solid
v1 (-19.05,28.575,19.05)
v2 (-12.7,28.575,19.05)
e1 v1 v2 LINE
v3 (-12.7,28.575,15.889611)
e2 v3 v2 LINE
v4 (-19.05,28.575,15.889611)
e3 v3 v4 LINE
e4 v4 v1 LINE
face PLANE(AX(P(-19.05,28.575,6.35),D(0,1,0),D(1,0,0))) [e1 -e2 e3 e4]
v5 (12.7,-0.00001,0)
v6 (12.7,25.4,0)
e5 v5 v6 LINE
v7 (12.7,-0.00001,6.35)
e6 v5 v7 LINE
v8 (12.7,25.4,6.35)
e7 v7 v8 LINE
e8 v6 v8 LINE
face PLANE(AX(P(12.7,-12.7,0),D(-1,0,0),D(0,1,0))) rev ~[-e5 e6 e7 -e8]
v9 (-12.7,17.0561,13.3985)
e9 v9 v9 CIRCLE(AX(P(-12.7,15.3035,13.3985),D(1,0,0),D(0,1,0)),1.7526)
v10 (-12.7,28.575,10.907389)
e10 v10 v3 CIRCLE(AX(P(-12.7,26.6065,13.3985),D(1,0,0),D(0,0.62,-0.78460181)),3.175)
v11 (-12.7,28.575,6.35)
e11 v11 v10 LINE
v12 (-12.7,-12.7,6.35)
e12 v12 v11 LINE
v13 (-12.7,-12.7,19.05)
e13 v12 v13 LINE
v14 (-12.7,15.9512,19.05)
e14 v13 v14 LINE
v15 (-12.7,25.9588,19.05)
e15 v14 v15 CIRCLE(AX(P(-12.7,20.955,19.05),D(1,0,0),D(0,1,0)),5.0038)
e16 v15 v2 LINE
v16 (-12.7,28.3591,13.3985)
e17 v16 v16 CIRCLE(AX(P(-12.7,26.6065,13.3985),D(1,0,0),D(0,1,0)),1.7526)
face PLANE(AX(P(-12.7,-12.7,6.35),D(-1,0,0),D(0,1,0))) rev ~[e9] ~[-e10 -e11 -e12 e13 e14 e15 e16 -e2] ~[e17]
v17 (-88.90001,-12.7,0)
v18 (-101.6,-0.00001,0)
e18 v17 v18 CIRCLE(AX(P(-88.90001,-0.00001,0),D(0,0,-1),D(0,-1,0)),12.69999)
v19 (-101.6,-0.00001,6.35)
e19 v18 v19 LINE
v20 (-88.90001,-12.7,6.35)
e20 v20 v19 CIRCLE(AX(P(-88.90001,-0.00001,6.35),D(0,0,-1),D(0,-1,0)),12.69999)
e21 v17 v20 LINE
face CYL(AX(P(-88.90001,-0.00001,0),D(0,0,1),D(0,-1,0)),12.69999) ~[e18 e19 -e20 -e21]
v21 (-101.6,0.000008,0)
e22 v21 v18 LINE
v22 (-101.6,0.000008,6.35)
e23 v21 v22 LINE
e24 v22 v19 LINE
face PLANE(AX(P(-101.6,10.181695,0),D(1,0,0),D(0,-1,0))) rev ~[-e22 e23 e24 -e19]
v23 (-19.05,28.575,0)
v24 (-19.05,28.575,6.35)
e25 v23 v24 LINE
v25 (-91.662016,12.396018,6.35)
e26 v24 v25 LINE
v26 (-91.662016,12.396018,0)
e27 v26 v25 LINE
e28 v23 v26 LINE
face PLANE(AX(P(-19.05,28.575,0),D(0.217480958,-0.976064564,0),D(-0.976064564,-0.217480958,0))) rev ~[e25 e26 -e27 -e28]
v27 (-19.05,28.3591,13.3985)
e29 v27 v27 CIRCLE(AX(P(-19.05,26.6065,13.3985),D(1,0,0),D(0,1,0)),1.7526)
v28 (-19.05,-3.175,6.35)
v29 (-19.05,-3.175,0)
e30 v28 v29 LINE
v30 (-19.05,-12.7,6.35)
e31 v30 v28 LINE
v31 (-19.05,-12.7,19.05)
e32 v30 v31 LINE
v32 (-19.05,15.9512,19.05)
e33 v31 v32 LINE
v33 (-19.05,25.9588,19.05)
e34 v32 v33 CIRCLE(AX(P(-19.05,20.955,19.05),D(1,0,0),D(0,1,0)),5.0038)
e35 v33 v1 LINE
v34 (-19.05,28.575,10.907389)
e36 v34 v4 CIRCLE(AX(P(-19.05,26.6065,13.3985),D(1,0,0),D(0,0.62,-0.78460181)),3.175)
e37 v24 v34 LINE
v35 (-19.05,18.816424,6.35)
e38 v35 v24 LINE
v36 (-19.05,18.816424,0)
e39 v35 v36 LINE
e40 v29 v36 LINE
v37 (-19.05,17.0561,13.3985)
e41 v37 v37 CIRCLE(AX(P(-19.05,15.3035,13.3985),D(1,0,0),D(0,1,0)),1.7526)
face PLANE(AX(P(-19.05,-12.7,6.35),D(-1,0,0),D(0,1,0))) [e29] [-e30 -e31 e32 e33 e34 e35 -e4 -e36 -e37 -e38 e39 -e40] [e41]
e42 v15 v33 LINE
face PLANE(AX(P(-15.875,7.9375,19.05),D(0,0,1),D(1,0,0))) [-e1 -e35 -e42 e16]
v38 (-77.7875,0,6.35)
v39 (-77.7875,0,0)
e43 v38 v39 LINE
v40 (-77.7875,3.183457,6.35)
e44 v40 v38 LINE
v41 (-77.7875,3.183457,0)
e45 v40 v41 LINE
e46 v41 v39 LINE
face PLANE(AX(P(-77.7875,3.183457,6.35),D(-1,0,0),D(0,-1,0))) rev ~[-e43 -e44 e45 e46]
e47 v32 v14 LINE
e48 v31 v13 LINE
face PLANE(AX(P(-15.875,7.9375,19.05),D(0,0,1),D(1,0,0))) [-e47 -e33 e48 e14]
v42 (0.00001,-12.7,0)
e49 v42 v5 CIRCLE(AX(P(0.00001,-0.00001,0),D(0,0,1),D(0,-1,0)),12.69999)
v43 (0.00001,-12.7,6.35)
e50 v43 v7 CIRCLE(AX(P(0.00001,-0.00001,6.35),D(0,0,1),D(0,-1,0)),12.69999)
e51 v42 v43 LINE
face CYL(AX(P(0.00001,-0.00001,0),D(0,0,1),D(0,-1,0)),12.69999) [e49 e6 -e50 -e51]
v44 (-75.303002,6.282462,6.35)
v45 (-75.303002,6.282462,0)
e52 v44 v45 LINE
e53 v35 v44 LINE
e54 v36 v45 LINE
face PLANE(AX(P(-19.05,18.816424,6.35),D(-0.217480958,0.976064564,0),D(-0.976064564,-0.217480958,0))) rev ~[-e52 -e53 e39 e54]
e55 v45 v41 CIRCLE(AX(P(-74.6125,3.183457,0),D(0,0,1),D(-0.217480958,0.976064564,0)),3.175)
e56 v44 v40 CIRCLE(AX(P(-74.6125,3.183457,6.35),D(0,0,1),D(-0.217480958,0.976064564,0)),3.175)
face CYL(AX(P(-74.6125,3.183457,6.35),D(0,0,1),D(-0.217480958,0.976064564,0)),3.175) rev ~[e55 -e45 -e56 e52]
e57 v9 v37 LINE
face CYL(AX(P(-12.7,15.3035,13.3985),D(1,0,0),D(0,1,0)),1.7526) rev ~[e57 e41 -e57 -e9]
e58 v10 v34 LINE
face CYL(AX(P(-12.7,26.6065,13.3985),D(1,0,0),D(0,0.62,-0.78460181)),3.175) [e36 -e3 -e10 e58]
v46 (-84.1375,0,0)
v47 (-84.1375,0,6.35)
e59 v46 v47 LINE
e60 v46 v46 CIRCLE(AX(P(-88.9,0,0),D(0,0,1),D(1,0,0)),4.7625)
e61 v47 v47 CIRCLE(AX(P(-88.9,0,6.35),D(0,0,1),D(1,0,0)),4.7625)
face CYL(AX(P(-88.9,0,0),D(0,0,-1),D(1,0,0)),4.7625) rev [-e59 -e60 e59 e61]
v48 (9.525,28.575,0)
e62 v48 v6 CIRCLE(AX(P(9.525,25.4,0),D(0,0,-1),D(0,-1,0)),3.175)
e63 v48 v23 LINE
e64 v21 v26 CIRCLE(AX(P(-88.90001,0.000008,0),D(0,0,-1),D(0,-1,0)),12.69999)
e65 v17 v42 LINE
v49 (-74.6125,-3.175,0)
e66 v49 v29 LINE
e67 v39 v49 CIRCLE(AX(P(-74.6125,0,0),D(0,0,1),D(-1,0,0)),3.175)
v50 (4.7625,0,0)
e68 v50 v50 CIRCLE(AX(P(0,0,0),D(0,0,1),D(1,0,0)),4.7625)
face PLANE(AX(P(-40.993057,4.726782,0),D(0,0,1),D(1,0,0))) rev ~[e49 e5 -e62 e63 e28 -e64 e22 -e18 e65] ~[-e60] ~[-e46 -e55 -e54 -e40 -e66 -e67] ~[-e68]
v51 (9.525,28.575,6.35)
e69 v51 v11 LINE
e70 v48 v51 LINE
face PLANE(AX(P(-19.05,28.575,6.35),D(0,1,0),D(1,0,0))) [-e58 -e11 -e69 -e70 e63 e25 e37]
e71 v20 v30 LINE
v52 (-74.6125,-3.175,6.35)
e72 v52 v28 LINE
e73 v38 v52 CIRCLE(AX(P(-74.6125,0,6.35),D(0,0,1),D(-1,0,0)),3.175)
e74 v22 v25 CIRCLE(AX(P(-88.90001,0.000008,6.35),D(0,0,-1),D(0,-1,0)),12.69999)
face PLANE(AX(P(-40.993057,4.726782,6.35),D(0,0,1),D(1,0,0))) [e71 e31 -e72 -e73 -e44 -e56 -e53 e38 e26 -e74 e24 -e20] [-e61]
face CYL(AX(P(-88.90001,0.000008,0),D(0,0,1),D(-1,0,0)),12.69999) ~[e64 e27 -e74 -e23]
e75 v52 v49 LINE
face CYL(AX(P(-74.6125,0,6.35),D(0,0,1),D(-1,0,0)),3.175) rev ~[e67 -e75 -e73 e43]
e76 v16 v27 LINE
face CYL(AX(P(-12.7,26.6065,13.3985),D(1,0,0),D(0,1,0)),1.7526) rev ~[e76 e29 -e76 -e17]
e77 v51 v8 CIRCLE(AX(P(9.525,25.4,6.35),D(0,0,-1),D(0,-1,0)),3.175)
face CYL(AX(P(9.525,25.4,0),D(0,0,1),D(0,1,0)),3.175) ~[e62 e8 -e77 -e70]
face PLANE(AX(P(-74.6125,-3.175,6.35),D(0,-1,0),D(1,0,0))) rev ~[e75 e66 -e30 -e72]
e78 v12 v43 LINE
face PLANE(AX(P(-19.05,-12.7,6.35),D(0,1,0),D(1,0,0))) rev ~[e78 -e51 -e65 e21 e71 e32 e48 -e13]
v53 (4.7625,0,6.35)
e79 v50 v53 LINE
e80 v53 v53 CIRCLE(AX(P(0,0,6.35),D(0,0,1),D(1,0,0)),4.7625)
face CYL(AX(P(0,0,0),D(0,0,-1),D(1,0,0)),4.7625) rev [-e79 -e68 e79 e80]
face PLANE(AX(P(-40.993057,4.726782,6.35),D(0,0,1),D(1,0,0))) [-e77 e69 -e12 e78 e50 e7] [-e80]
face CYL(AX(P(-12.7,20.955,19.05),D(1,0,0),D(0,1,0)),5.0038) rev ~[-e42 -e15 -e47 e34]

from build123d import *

# Parameters (mm, degrees)
F0_R      = 4.7625
F1_DEPTH  = 6.35
F2_R      = 12.69999
F3_W      = 6.35
F3_H      = 41.275
F4_DEPTH  = 12.7
F6_DEPTH  = 25.4
F7_R      = 3.175
F8_R      = 5.0038
F8_R_2    = 1.7526
F9_DEPTH  = 25.4
F11_DEPTH = 6.35


# Not quite as in the source:
# - a fillet or chamfer is up to 0.001 mm smaller than in the source, because OpenCascade refuses the exact size


with BuildPart() as f1:
    # F0 (on Top) → F1 (new body)
    with BuildSketch(Plane.XY):
        Polygon((-101.6, -12.7), (12.7, -12.7), (12.7, 28.575), (-19.05, 28.575), (-101.6, 10.1816951473), align=None)
        with Locations((-88.9, 0)):
            Circle(F0_R, mode=Mode.SUBTRACT)
        Circle(F0_R, mode=Mode.SUBTRACT)
    extrude(amount=F1_DEPTH)

    # F2 (radius 12.7 in the source; OpenCascade refuses exactly that, so slightly less here)
    f2_edges = [f1.edges().sort_by_distance(p)[0] for p in [
        (12.7, -12.7, 3.175),
        (-101.6, -12.7, 3.175),
        (-101.6, 10.181695, 3.175),
    ]]
    fillet(f2_edges, radius=F2_R)

    # F3 (on face) → F4 (join)
    with BuildSketch(Plane.XY.offset(6.35)):
        with Locations((-15.875, 7.9375)):
            Rectangle(F3_W, F3_H)
    extrude(amount=F4_DEPTH)

    # F5 (on face) → F6 (cut)
    with BuildSketch(Plane.XY.offset(6.35)):
        with BuildLine():
            Line((-19.05, 18.8164242334), (-75.3030020415, 6.2824615995))
            ThreePointArc((-75.3030020415, 6.2824615995), (-77.0896928651, 5.1694426385), (-77.7875, 3.1834566091))
            Line((-77.7875, 3.1834566091), (-77.7875, 0))
            ThreePointArc((-77.7875, 0), (-76.8575640303, -2.2450640303), (-74.6125, -3.175))
            Line((-74.6125, -3.175), (-19.05, -3.175))
            Line((-19.05, -3.175), (-19.05, 18.8164242334))
        make_face()
    extrude(amount=-F6_DEPTH, mode=Mode.SUBTRACT)

    # F7
    f7_edges = [f1.edges().sort_by_distance(p)[0] for p in [
        (12.7, 28.575, 3.175),
    ]]
    fillet(f7_edges, radius=F7_R)

    # F8 (on face) → F9 (cut)
    with BuildSketch(Plane.YZ.offset(-12.7)):
        with Locations((20.955, 19.05)):
            Circle(F8_R)
        with Locations((26.6065, 13.3985)):
            Circle(F8_R_2)
        with Locations((15.3035, 13.3985)):
            Circle(F8_R_2)
    extrude(amount=-F9_DEPTH, mode=Mode.SUBTRACT)

    # F10 (on face) → F11 (join)
    with BuildSketch(Plane.YZ.offset(-12.7)):
        with BuildLine():
            Line((28.575, 15.8896107462), (28.575, 10.9073892538))
            ThreePointArc((28.575, 10.9073892538), (29.7815, 13.3985), (28.575, 15.8896107462))
        make_face()
    extrude(amount=-F11_DEPTH)


solid = f1.part
